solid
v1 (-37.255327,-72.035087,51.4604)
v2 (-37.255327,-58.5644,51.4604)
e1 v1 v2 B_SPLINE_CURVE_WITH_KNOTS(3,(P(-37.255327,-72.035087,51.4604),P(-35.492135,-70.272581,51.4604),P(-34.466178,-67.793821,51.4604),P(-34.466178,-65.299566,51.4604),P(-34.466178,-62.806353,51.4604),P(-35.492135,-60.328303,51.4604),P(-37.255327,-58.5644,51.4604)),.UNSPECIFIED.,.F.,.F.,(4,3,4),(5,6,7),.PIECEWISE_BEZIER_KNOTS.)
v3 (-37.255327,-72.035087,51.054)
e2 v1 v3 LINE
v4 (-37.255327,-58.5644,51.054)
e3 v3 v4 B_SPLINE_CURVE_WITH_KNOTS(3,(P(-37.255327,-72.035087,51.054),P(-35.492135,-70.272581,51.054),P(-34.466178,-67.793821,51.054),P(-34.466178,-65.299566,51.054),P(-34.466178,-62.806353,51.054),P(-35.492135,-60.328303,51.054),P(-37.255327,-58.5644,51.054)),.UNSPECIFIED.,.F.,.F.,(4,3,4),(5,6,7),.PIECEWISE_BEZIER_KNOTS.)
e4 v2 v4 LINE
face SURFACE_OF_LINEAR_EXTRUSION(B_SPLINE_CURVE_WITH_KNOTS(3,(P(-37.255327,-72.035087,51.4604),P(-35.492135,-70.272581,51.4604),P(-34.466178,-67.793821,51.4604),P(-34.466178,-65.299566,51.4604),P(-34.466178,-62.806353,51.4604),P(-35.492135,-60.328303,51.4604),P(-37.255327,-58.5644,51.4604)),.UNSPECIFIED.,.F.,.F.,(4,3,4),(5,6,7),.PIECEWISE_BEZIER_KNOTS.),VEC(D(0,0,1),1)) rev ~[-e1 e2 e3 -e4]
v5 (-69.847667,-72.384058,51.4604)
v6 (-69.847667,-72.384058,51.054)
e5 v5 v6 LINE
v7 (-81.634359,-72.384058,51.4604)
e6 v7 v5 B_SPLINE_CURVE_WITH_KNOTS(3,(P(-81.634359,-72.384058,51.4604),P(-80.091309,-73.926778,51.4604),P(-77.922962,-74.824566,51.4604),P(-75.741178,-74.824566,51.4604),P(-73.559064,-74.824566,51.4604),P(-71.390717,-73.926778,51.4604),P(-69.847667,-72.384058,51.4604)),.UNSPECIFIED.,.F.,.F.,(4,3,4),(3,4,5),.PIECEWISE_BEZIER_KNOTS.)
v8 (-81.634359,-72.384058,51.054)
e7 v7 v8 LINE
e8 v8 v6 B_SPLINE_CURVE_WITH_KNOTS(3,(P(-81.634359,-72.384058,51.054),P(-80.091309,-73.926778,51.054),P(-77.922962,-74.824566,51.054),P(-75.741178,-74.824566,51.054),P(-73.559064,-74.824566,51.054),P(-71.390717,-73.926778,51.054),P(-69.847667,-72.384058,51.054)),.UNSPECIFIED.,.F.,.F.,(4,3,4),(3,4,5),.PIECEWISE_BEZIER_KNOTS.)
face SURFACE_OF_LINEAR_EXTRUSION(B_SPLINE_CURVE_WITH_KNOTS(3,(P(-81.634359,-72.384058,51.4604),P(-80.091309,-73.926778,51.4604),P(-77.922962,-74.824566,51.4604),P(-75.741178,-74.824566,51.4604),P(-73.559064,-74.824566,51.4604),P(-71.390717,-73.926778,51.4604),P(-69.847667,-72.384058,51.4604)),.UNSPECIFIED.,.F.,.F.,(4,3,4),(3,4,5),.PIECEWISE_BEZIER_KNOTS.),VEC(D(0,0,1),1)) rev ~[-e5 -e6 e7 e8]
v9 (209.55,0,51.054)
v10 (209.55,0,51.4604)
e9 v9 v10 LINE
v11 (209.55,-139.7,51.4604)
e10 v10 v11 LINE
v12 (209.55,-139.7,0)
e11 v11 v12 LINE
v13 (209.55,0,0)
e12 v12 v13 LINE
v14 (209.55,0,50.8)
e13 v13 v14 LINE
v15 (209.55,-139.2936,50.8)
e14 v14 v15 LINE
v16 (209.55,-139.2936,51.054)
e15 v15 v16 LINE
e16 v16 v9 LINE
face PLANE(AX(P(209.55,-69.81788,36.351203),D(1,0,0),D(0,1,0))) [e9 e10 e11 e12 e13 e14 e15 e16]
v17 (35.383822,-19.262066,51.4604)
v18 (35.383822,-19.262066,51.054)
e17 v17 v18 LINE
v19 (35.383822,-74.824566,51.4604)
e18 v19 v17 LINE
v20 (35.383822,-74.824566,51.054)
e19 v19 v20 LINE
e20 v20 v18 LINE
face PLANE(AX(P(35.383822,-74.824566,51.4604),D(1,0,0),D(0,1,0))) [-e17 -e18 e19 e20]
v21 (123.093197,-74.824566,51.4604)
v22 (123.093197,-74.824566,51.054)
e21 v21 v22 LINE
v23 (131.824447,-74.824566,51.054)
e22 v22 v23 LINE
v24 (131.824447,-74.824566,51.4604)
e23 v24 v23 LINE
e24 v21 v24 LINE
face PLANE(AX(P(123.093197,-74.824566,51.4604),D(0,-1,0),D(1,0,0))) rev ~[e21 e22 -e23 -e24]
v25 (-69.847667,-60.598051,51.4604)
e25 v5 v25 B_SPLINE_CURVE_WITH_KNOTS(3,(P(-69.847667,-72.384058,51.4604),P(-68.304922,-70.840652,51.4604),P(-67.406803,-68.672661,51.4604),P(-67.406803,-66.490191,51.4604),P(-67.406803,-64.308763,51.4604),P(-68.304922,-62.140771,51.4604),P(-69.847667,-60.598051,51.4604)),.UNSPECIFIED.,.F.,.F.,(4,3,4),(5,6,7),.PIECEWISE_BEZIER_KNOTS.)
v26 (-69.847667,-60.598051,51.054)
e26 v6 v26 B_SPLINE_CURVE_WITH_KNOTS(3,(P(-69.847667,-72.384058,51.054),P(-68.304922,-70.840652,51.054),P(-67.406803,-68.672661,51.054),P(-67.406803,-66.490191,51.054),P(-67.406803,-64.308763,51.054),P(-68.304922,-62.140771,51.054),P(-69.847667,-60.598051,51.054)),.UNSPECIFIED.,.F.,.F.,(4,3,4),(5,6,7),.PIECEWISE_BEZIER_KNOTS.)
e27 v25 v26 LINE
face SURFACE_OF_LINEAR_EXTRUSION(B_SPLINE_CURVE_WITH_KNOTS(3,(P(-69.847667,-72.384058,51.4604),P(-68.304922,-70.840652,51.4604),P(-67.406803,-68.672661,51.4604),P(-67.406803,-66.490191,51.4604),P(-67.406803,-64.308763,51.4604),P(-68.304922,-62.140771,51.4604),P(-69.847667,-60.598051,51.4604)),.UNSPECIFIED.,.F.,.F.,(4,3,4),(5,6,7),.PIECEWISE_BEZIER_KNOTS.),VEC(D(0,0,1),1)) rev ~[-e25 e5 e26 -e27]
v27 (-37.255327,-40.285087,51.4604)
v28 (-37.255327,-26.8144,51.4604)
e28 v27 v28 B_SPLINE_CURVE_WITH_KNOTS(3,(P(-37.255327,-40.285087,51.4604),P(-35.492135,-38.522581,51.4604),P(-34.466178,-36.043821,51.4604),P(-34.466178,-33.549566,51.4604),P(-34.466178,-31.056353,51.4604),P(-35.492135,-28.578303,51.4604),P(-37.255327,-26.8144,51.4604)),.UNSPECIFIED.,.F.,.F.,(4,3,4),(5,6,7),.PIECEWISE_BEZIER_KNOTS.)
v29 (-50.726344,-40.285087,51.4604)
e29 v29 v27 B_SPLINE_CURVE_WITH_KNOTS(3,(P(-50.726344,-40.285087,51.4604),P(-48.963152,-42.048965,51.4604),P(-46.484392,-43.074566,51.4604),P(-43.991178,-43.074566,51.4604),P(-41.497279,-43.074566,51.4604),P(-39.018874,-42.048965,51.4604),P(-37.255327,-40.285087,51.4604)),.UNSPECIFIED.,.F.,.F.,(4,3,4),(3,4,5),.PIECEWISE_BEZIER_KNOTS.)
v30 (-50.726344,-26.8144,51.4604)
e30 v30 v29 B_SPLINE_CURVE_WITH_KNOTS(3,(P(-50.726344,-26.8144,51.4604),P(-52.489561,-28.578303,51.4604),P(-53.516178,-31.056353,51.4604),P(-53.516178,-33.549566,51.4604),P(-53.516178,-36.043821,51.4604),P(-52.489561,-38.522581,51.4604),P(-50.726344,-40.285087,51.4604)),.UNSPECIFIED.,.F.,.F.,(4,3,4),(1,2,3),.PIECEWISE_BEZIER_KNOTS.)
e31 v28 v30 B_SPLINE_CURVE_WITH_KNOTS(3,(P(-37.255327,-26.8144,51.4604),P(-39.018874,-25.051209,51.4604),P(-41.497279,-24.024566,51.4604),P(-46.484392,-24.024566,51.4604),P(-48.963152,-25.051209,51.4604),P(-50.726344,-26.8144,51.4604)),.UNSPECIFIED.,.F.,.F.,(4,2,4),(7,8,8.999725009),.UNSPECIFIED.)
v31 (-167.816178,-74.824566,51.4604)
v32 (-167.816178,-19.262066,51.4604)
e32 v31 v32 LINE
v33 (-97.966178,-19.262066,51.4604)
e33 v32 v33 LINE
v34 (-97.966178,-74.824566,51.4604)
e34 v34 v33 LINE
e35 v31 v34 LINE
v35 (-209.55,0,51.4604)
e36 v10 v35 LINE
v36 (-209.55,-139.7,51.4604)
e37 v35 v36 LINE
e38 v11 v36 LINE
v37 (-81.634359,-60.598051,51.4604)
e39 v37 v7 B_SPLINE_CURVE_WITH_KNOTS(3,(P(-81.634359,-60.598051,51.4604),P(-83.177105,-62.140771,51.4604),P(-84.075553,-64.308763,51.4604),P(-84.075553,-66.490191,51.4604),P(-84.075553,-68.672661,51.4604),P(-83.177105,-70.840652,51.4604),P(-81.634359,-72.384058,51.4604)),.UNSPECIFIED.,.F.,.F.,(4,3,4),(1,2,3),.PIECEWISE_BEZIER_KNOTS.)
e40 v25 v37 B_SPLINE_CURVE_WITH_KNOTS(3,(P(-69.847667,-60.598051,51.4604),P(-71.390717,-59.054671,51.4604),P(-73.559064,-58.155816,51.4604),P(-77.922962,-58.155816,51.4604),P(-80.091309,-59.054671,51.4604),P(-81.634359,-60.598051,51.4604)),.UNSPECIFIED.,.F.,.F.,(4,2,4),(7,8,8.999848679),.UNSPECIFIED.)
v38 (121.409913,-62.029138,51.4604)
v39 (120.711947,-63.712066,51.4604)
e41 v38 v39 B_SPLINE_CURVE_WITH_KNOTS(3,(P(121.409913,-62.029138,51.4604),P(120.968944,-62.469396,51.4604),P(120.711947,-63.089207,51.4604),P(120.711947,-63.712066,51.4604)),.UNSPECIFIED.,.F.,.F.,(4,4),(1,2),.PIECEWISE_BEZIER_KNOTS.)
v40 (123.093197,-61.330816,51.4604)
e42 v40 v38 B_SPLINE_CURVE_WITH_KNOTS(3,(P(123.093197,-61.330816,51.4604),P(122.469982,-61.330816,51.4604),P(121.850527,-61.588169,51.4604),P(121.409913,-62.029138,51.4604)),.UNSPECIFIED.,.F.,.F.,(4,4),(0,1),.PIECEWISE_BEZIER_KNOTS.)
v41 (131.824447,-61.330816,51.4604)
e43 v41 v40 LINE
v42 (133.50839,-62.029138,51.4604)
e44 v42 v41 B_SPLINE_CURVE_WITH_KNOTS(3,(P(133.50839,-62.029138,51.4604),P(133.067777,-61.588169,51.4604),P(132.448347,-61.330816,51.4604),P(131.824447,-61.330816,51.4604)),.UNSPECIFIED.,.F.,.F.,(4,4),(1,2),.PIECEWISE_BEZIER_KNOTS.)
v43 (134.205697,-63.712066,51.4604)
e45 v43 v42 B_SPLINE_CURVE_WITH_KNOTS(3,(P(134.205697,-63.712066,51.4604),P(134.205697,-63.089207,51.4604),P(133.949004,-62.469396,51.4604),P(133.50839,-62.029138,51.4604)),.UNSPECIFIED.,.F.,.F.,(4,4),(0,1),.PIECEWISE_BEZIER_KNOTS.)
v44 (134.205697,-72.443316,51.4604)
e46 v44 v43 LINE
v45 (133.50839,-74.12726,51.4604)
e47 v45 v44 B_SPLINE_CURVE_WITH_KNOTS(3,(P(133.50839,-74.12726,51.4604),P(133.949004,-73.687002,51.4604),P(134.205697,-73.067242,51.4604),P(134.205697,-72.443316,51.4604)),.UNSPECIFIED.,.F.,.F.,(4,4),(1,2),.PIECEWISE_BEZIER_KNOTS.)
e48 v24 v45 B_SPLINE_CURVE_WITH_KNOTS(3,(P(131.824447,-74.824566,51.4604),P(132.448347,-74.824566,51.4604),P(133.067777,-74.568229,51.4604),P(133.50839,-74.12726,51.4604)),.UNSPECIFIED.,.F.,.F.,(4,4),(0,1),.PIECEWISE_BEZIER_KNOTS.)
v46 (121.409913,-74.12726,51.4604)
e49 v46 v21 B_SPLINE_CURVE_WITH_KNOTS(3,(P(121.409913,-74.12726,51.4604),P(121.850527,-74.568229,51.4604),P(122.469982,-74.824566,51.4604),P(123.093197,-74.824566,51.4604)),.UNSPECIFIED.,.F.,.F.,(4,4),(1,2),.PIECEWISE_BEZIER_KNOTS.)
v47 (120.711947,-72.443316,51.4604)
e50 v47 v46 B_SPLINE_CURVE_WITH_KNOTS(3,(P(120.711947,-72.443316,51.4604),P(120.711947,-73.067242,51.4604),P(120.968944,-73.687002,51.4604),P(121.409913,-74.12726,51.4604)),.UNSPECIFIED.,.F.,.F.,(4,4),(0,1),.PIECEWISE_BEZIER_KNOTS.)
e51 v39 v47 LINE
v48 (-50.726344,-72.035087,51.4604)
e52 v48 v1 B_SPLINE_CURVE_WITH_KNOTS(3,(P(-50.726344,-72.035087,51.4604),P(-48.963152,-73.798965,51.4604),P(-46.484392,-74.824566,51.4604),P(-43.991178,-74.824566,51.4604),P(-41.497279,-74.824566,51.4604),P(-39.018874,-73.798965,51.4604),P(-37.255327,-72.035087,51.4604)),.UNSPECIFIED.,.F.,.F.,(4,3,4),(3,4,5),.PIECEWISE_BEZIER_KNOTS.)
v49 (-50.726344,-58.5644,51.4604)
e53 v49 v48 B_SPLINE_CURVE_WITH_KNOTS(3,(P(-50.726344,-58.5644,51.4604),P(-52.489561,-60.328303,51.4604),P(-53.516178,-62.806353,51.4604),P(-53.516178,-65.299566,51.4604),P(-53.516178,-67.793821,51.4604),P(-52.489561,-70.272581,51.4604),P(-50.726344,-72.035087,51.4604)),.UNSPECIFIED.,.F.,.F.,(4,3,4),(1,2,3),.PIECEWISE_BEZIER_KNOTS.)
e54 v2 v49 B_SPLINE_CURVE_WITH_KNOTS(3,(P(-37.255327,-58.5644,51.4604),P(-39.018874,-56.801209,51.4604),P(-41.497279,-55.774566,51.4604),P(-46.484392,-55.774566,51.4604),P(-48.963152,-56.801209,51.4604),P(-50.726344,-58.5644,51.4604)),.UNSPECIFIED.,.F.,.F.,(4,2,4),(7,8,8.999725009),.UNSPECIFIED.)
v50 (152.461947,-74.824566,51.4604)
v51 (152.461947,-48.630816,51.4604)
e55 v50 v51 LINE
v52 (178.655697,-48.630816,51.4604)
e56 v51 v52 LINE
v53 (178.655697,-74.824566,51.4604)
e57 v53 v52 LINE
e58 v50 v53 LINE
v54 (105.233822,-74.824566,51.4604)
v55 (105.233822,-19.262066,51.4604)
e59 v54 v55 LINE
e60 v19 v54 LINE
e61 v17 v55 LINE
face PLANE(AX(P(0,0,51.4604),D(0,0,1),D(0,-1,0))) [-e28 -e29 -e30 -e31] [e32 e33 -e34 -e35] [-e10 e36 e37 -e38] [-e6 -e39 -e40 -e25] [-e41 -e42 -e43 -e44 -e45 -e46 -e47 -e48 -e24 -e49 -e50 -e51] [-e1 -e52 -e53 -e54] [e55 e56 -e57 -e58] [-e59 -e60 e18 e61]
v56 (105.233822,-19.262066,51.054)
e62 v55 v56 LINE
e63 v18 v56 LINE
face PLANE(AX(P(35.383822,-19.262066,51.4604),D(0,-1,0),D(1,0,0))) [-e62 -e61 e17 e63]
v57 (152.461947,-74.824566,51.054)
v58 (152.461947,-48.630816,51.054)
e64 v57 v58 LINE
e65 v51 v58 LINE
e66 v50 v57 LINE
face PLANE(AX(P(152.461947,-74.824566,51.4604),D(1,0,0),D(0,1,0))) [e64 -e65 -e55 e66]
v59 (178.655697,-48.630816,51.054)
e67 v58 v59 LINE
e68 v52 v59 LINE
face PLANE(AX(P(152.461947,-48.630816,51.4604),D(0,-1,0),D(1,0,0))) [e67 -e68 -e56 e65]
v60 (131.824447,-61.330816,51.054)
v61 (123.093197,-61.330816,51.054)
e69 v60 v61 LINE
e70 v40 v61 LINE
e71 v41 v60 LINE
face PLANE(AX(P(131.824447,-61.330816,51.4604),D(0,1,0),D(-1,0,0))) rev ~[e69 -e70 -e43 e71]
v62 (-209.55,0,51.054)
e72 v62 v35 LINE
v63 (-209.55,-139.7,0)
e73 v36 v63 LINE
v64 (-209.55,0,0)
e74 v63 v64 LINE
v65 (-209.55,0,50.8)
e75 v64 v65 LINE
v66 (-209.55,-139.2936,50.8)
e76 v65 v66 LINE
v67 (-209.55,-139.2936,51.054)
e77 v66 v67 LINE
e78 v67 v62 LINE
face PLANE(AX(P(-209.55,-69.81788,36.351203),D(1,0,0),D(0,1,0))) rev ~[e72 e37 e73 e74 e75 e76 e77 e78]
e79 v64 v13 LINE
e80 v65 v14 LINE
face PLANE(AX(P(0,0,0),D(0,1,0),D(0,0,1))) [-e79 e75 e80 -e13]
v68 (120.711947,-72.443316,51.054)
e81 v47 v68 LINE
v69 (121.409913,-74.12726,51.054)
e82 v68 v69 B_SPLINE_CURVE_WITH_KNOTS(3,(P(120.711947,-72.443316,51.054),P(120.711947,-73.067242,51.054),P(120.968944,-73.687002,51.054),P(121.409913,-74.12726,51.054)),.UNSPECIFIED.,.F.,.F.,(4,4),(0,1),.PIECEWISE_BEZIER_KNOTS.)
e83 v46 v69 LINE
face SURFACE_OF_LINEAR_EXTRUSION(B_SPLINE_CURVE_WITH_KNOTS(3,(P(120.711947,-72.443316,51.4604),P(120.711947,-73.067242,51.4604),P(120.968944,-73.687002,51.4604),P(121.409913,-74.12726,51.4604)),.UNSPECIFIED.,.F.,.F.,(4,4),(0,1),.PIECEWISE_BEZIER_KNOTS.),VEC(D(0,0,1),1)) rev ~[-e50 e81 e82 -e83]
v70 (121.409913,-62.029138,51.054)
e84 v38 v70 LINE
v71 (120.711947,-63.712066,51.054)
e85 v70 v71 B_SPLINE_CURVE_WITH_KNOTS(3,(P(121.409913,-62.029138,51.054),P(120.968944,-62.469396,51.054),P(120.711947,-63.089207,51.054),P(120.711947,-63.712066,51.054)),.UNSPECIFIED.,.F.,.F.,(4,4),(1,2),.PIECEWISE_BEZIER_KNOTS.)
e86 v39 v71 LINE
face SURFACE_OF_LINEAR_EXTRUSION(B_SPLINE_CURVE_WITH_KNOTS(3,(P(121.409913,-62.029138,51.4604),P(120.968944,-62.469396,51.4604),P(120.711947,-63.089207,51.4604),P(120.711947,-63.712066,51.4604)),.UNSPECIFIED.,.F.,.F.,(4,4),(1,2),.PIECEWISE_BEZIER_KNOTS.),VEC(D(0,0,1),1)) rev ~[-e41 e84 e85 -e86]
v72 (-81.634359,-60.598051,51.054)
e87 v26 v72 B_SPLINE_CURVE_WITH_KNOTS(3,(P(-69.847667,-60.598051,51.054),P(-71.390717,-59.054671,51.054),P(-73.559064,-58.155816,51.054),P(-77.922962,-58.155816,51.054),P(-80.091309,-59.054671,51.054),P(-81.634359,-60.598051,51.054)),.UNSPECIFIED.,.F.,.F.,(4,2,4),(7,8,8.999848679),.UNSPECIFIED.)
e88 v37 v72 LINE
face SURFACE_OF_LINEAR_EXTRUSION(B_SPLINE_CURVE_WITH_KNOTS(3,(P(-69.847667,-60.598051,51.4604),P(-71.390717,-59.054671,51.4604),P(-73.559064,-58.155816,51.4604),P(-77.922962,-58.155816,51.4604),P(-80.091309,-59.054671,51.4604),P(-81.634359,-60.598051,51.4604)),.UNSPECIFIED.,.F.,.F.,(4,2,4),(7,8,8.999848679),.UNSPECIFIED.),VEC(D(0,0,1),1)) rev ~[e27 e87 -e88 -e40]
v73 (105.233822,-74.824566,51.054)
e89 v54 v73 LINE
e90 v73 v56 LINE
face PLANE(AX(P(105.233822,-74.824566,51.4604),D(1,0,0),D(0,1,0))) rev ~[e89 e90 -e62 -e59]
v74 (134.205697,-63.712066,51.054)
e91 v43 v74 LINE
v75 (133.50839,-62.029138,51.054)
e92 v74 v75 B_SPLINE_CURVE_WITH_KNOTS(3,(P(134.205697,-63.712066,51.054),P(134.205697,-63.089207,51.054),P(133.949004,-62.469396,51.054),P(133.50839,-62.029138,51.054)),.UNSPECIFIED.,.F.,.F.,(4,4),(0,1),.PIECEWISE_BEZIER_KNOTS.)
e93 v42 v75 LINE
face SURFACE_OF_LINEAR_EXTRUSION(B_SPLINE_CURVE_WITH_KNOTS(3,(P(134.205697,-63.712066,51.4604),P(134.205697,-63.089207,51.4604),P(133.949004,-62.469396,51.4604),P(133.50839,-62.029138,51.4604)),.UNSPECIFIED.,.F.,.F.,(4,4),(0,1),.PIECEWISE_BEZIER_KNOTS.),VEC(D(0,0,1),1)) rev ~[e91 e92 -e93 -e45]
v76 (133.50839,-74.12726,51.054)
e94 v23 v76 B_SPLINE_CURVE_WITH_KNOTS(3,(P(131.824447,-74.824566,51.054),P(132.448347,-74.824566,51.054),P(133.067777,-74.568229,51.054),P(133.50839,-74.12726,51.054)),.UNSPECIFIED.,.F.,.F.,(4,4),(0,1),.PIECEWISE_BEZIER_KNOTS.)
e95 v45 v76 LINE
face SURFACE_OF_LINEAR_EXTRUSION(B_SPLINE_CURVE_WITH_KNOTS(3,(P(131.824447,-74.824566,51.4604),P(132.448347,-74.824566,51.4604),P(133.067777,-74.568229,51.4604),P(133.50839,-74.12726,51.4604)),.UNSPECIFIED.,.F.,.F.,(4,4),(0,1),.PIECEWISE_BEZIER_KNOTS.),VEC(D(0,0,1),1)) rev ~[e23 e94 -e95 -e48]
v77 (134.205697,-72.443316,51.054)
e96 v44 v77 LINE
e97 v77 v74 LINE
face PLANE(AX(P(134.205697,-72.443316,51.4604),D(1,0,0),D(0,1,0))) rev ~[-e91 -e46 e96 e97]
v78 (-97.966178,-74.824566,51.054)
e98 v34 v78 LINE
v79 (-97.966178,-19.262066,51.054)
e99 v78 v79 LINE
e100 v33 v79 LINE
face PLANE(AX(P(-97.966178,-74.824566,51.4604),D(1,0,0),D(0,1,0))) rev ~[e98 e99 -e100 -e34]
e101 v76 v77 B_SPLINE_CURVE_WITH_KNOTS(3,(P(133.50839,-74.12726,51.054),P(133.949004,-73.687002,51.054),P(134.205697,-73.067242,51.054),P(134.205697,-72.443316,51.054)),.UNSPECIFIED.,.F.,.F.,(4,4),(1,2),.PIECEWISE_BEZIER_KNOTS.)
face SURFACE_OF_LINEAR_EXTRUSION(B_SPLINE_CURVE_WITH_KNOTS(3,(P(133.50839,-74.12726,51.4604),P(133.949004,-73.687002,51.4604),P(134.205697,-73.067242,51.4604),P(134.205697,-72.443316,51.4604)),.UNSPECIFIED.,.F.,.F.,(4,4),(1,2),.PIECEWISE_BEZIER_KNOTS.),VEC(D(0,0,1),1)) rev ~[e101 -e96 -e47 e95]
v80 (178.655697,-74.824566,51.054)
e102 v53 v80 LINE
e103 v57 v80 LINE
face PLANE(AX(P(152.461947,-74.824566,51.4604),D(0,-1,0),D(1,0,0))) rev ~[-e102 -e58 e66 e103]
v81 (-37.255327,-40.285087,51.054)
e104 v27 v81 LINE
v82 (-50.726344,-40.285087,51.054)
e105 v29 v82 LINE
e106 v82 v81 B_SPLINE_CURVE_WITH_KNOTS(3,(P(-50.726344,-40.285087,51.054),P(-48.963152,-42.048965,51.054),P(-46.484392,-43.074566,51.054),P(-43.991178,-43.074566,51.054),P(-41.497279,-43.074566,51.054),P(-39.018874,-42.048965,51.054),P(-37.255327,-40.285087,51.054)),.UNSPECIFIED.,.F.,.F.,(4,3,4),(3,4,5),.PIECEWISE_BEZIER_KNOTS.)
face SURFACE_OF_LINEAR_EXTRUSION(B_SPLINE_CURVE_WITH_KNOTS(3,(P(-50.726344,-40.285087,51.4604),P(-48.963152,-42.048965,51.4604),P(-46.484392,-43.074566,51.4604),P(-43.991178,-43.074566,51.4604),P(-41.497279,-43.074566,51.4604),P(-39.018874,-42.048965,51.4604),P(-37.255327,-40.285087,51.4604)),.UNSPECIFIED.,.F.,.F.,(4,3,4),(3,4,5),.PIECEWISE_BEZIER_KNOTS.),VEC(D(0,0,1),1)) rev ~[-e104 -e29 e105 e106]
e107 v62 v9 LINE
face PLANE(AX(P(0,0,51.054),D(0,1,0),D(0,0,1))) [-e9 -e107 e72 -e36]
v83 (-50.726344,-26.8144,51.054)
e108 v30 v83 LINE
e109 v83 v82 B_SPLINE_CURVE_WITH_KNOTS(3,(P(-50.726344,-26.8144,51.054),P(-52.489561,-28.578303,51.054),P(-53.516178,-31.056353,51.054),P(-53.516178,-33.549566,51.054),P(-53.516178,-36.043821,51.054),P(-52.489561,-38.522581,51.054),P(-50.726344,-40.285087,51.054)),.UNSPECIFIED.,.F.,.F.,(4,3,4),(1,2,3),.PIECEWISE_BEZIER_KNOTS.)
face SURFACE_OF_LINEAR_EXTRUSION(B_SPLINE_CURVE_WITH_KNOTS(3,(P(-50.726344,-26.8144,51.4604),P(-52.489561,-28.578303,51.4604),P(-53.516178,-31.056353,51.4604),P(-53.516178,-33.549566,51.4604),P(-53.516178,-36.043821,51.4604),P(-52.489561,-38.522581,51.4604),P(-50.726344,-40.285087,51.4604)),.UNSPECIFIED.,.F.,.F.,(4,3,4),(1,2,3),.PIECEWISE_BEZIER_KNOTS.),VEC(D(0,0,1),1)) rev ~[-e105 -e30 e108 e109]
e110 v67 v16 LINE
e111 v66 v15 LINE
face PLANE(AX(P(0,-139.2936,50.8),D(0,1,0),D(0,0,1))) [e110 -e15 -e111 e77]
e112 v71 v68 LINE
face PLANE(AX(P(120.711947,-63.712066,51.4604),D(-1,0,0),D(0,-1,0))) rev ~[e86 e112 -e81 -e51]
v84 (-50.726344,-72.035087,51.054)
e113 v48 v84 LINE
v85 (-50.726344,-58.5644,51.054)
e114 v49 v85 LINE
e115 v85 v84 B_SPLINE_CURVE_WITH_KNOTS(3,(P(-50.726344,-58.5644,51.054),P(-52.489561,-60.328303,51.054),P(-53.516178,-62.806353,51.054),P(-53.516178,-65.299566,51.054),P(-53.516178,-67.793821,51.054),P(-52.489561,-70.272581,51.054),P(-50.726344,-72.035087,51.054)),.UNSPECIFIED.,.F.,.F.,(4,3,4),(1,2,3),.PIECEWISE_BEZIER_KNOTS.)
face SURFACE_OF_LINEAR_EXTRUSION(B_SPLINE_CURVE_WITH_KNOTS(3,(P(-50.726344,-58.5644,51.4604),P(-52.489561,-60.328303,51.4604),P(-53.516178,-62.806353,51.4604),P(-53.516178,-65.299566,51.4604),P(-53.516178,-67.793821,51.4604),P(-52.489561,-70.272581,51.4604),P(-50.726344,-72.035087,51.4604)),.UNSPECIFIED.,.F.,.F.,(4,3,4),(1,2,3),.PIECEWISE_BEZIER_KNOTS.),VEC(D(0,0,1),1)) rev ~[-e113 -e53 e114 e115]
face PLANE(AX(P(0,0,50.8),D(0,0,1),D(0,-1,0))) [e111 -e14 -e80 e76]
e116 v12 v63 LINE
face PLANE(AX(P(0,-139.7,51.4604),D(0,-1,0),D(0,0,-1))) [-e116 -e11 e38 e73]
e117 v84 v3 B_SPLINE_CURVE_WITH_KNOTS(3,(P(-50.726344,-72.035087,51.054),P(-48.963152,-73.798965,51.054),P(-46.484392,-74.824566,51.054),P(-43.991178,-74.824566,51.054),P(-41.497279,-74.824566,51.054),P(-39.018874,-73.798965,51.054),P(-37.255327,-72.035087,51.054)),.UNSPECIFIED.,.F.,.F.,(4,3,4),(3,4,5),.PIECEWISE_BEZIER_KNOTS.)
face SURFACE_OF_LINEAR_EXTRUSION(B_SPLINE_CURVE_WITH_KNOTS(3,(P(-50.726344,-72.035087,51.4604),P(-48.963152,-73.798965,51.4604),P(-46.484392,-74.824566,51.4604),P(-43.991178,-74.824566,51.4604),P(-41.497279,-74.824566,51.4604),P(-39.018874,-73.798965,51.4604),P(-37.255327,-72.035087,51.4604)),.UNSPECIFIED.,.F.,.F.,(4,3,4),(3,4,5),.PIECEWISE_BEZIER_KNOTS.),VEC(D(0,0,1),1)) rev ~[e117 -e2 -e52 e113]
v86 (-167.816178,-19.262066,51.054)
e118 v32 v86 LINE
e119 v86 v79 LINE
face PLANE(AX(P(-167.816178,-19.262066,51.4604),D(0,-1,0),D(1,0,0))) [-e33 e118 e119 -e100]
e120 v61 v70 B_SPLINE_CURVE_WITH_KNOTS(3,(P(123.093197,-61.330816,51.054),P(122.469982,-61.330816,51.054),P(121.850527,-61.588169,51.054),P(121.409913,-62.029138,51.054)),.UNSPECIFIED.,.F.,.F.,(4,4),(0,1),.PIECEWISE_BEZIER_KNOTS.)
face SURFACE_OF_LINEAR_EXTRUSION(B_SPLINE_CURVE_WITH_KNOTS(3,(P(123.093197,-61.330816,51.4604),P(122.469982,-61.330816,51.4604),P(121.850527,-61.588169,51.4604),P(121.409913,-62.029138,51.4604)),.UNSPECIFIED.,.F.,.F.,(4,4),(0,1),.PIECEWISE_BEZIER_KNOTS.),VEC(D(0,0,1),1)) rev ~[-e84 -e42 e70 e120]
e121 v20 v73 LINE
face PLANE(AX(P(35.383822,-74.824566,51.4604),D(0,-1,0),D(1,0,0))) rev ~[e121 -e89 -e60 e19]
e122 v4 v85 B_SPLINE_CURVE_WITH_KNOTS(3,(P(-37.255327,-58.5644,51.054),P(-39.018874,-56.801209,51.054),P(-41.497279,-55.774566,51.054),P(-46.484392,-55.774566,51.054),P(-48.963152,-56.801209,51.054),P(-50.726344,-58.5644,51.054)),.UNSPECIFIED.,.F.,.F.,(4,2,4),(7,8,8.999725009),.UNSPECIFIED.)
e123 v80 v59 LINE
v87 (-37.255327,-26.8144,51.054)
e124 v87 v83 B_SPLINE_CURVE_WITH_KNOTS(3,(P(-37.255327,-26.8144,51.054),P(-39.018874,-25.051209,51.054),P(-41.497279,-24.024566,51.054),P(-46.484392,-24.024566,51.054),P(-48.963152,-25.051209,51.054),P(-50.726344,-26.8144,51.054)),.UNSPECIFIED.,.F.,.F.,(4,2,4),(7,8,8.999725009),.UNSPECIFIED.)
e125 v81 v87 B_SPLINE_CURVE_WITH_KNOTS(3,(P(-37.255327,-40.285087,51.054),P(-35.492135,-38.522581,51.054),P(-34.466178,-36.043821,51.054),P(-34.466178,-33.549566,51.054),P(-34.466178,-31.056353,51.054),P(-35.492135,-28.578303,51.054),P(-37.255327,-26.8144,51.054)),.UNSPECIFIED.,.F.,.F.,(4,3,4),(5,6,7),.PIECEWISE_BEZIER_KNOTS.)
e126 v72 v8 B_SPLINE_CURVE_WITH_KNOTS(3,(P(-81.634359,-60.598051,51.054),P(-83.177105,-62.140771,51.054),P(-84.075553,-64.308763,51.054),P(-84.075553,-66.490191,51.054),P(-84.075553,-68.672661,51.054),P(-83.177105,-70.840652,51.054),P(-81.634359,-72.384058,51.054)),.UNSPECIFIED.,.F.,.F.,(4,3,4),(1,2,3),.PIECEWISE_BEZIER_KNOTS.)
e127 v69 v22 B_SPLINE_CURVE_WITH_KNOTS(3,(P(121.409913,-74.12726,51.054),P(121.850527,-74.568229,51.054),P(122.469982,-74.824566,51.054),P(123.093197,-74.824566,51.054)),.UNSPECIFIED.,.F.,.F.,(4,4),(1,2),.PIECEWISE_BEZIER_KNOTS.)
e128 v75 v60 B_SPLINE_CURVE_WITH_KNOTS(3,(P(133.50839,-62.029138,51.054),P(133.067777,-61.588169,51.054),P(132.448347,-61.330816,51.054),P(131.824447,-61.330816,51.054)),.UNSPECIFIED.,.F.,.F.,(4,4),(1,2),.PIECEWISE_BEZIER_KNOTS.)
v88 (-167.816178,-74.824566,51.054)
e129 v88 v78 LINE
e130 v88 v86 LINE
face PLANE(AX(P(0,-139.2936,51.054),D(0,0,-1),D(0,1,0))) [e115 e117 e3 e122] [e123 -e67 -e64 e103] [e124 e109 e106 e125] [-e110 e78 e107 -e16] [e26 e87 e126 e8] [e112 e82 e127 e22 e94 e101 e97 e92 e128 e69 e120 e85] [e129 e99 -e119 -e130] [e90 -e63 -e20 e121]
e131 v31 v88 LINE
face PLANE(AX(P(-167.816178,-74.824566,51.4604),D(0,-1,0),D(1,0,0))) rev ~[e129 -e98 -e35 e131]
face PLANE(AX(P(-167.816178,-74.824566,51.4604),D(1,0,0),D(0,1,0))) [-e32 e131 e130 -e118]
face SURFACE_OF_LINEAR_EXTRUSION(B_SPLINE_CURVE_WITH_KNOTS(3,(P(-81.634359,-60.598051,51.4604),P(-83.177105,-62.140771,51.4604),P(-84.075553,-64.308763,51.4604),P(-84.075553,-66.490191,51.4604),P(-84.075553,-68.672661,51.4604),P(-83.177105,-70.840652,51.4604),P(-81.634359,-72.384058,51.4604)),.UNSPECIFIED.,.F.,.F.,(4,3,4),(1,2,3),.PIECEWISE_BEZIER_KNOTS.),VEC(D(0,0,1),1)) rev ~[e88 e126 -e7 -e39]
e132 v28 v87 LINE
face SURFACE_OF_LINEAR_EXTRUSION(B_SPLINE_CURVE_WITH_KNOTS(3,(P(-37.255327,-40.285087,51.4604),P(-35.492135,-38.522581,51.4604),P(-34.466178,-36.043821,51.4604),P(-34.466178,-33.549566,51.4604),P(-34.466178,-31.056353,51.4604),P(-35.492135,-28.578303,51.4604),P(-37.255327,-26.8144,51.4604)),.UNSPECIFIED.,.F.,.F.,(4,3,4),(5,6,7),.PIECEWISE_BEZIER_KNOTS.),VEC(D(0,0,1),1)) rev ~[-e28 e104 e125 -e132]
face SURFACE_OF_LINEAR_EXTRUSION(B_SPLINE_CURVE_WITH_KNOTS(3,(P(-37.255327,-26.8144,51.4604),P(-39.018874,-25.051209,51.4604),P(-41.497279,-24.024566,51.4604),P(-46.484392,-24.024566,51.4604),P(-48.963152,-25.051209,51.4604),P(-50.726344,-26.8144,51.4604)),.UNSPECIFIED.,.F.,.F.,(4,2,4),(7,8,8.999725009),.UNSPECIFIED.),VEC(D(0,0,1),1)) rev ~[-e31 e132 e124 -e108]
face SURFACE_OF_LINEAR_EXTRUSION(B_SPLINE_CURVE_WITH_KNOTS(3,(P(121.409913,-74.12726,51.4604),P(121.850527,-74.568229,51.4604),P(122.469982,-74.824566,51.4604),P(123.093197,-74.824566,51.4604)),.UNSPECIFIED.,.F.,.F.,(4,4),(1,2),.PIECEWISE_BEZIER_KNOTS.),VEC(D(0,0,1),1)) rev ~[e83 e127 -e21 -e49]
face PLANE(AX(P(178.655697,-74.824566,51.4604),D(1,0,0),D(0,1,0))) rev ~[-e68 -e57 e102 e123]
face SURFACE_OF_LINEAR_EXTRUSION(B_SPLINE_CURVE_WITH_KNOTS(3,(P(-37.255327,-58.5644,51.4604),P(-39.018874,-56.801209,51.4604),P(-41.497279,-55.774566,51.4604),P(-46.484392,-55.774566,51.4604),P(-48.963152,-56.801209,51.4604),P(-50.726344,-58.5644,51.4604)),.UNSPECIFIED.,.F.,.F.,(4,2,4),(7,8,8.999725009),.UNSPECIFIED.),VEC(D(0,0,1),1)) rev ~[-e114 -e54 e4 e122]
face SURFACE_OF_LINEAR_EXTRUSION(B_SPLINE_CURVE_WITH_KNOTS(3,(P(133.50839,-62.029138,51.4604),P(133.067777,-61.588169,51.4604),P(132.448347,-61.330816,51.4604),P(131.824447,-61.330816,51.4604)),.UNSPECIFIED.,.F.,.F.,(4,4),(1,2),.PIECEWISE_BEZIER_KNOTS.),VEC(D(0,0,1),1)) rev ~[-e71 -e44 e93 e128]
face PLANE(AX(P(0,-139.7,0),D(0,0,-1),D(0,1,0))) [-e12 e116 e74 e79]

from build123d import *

# Parameters (mm, degrees)
F1_DEPTH = 209.55
F2_W     = 69.85
F2_H     = 55.5625
F2_W_2   = 26.19375
F2_H_2   = 26.19375
F3_DEPTH = 0.4064


# Not quite as in the source:
# - the dataset's text gives a spline's control points without its knots; the knots are read off the source's solid


with BuildPart() as f1:
    # F0 (on Right) → F1 (new body, symmetric)
    with BuildSketch(Plane.YZ):
        Polygon((-139.7, 0), (0, 0), (0, 50.8), (-139.2936, 50.8), (-139.2936, 51.054), (0, 51.054), (0, 51.4604), (-139.7, 51.4604), align=None)
    extrude(amount=F1_DEPTH, both=True)

    # F2 (on face) → F3 (cut, through all)
    with BuildSketch(Plane.XY.offset(51.4604)):
        with Locations((-132.8911783457, -47.0433160888)):
            Rectangle(F2_W, F2_H)
        with Locations((70.3088216543, -47.0433160888)):
            Rectangle(F2_W, F2_H)
        with BuildLine():
            add(Edge.make_bspline(
                [(121.4099132543, -62.0291382888), (120.9689438543, -62.4693964888), (120.7119466543, -63.0892072888), (120.7119466543, -63.7120660888)],
                knots=[1, 1, 1, 1, 2, 2, 2, 2], degree=3))
            Line((120.7119466543, -63.7120660888), (120.7119466543, -72.4433160888))
            add(Edge.make_bspline(
                [(120.7119466543, -72.4433160888), (120.7119466543, -73.0672416888), (120.9689438543, -73.6870016888), (121.4099132543, -74.1272598888)],
                knots=[0, 0, 0, 0, 1, 1, 1, 1], degree=3))
            add(Edge.make_bspline(
                [(121.4099132543, -74.1272598888), (121.8505270543, -74.5682292888), (122.4699822543, -74.8245660888), (123.0931966543, -74.8245660888)],
                knots=[1, 1, 1, 1, 2, 2, 2, 2], degree=3))
            Line((123.0931966543, -74.8245660888), (131.8244466543, -74.8245660888))
            add(Edge.make_bspline(
                [(131.8244466543, -74.8245660888), (132.4483468543, -74.8245660888), (133.0677766543, -74.5682292888), (133.5083904543, -74.1272598888)],
                knots=[0, 0, 0, 0, 1, 1, 1, 1], degree=3))
            add(Edge.make_bspline(
                [(133.5083904543, -74.1272598888), (133.9490042543, -73.6870016888), (134.2056966543, -73.0672416888), (134.2056966543, -72.4433160888)],
                knots=[1, 1, 1, 1, 2, 2, 2, 2], degree=3))
            Line((134.2056966543, -72.4433160888), (134.2056966543, -63.7120660888))
            add(Edge.make_bspline(
                [(134.2056966543, -63.7120660888), (134.2056966543, -63.0892072888), (133.9490042543, -62.4693964888), (133.5083904543, -62.0291382888)],
                knots=[0, 0, 0, 0, 1, 1, 1, 1], degree=3))
            add(Edge.make_bspline(
                [(133.5083904543, -62.0291382888), (133.0677766543, -61.5881688888), (132.4483468543, -61.3308160888), (131.8244466543, -61.3308160888)],
                knots=[1, 1, 1, 1, 2, 2, 2, 2], degree=3))
            Line((131.8244466543, -61.3308160888), (123.0931966543, -61.3308160888))
            add(Edge.make_bspline(
                [(123.0931966543, -61.3308160888), (122.4699822543, -61.3308160888), (121.8505270543, -61.5881688888), (121.4099132543, -62.0291382888)],
                knots=[0, 0, 0, 0, 1, 1, 1, 1], degree=3))
        make_face()
        with Locations((165.5588216543, -61.7276910888)):
            Rectangle(F2_W_2, F2_H_2)
        with BuildLine():
            add(Edge.make_bspline(
                [(-69.8476671457, -60.5980514888), (-71.3907171457, -59.0546712888), (-73.5590643457, -58.1558160888), (-75.7411783457, -58.1558160888)],
                knots=[7, 7, 7, 7, 8, 8, 8, 8], degree=3))
            add(Edge.make_bspline(
                [(-75.7411783457, -58.1558160888), (-77.9229621457, -58.1558160888), (-80.0913093457, -59.0546712888), (-81.6343593457, -60.5980514888)],
                knots=[0, 0, 0, 0, 1, 1, 1, 1], degree=3))
            add(Edge.make_bspline(
                [(-81.6343593457, -60.5980514888), (-83.1771045457, -62.1407712888), (-84.0755533457, -64.3087628888), (-84.0755533457, -66.4901910888), (-84.0755533457, -68.6726606888), (-83.1771045457, -70.8406522888), (-81.6343593457, -72.3840578888)],
                knots=[1, 1, 1, 1, 2, 2, 2, 3, 3, 3, 3], degree=3))
            add(Edge.make_bspline(
                [(-81.6343593457, -72.3840578888), (-80.0913093457, -73.9267776888), (-77.9229621457, -74.8245660888), (-75.7411783457, -74.8245660888), (-73.5590643457, -74.8245660888), (-71.3907171457, -73.9267776888), (-69.8476671457, -72.3840578888)],
                knots=[3, 3, 3, 3, 4, 4, 4, 5, 5, 5, 5], degree=3))
            add(Edge.make_bspline(
                [(-69.8476671457, -72.3840578888), (-68.3049219457, -70.8406522888), (-67.4068033457, -68.6726606888), (-67.4068033457, -66.4901910888), (-67.4068033457, -64.3087628888), (-68.3049219457, -62.1407712888), (-69.8476671457, -60.5980514888)],
                knots=[5, 5, 5, 5, 6, 6, 6, 7, 7, 7, 7], degree=3))
        make_face()
        with BuildLine():
            add(Edge.make_bspline(
                [(-37.2553269457, -58.5644004888), (-39.0188743457, -56.8012086888), (-41.4972793457, -55.7745660888), (-43.9911783457, -55.7745660888)],
                knots=[7, 7, 7, 7, 8, 8, 8, 8], degree=3))
            add(Edge.make_bspline(
                [(-43.9911783457, -55.7745660888), (-46.4843915457, -55.7745660888), (-48.9631521457, -56.8012086888), (-50.7263439457, -58.5644004888)],
                knots=[0, 0, 0, 0, 1, 1, 1, 1], degree=3))
            add(Edge.make_bspline(
                [(-50.7263439457, -58.5644004888), (-52.4895611457, -60.3283034888), (-53.5161783457, -62.8063528888), (-53.5161783457, -65.2995660888), (-53.5161783457, -67.7938206888), (-52.4895611457, -70.2725812888), (-50.7263439457, -72.0350872888)],
                knots=[1, 1, 1, 1, 2, 2, 2, 3, 3, 3, 3], degree=3))
            add(Edge.make_bspline(
                [(-50.7263439457, -72.0350872888), (-48.9631521457, -73.7989648888), (-46.4843915457, -74.8245660888), (-43.9911783457, -74.8245660888), (-41.4972793457, -74.8245660888), (-39.0188743457, -73.7989648888), (-37.2553269457, -72.0350872888)],
                knots=[3, 3, 3, 3, 4, 4, 4, 5, 5, 5, 5], degree=3))
            add(Edge.make_bspline(
                [(-37.2553269457, -72.0350872888), (-35.4921351457, -70.2725812888), (-34.4661783457, -67.7938206888), (-34.4661783457, -65.2995660888), (-34.4661783457, -62.8063528888), (-35.4921351457, -60.3283034888), (-37.2553269457, -58.5644004888)],
                knots=[5, 5, 5, 5, 6, 6, 6, 7, 7, 7, 7], degree=3))
        make_face()
        with BuildLine():
            add(Edge.make_bspline(
                [(-37.2553269457, -26.8144004888), (-39.0188743457, -25.0512086888), (-41.4972793457, -24.0245660888), (-43.9911783457, -24.0245660888)],
                knots=[7, 7, 7, 7, 8, 8, 8, 8], degree=3))
            add(Edge.make_bspline(
                [(-43.9911783457, -24.0245660888), (-46.4843915457, -24.0245660888), (-48.9631521457, -25.0512086888), (-50.7263439457, -26.8144004888)],
                knots=[0, 0, 0, 0, 1, 1, 1, 1], degree=3))
            add(Edge.make_bspline(
                [(-50.7263439457, -26.8144004888), (-52.4895611457, -28.5783034888), (-53.5161783457, -31.0563528888), (-53.5161783457, -33.5495660888), (-53.5161783457, -36.0438206888), (-52.4895611457, -38.5225812888), (-50.7263439457, -40.2850872888)],
                knots=[1, 1, 1, 1, 2, 2, 2, 3, 3, 3, 3], degree=3))
            add(Edge.make_bspline(
                [(-50.7263439457, -40.2850872888), (-48.9631521457, -42.0489648888), (-46.4843915457, -43.0745660888), (-43.9911783457, -43.0745660888), (-41.4972793457, -43.0745660888), (-39.0188743457, -42.0489648888), (-37.2553269457, -40.2850872888)],
                knots=[3, 3, 3, 3, 4, 4, 4, 5, 5, 5, 5], degree=3))
            add(Edge.make_bspline(
                [(-37.2553269457, -40.2850872888), (-35.4921351457, -38.5225812888), (-34.4661783457, -36.0438206888), (-34.4661783457, -33.5495660888), (-34.4661783457, -31.0563528888), (-35.4921351457, -28.5783034888), (-37.2553269457, -26.8144004888)],
                knots=[5, 5, 5, 5, 6, 6, 6, 7, 7, 7, 7], degree=3))
        make_face()
    extrude(amount=-F3_DEPTH, mode=Mode.SUBTRACT)


solid = f1.part
